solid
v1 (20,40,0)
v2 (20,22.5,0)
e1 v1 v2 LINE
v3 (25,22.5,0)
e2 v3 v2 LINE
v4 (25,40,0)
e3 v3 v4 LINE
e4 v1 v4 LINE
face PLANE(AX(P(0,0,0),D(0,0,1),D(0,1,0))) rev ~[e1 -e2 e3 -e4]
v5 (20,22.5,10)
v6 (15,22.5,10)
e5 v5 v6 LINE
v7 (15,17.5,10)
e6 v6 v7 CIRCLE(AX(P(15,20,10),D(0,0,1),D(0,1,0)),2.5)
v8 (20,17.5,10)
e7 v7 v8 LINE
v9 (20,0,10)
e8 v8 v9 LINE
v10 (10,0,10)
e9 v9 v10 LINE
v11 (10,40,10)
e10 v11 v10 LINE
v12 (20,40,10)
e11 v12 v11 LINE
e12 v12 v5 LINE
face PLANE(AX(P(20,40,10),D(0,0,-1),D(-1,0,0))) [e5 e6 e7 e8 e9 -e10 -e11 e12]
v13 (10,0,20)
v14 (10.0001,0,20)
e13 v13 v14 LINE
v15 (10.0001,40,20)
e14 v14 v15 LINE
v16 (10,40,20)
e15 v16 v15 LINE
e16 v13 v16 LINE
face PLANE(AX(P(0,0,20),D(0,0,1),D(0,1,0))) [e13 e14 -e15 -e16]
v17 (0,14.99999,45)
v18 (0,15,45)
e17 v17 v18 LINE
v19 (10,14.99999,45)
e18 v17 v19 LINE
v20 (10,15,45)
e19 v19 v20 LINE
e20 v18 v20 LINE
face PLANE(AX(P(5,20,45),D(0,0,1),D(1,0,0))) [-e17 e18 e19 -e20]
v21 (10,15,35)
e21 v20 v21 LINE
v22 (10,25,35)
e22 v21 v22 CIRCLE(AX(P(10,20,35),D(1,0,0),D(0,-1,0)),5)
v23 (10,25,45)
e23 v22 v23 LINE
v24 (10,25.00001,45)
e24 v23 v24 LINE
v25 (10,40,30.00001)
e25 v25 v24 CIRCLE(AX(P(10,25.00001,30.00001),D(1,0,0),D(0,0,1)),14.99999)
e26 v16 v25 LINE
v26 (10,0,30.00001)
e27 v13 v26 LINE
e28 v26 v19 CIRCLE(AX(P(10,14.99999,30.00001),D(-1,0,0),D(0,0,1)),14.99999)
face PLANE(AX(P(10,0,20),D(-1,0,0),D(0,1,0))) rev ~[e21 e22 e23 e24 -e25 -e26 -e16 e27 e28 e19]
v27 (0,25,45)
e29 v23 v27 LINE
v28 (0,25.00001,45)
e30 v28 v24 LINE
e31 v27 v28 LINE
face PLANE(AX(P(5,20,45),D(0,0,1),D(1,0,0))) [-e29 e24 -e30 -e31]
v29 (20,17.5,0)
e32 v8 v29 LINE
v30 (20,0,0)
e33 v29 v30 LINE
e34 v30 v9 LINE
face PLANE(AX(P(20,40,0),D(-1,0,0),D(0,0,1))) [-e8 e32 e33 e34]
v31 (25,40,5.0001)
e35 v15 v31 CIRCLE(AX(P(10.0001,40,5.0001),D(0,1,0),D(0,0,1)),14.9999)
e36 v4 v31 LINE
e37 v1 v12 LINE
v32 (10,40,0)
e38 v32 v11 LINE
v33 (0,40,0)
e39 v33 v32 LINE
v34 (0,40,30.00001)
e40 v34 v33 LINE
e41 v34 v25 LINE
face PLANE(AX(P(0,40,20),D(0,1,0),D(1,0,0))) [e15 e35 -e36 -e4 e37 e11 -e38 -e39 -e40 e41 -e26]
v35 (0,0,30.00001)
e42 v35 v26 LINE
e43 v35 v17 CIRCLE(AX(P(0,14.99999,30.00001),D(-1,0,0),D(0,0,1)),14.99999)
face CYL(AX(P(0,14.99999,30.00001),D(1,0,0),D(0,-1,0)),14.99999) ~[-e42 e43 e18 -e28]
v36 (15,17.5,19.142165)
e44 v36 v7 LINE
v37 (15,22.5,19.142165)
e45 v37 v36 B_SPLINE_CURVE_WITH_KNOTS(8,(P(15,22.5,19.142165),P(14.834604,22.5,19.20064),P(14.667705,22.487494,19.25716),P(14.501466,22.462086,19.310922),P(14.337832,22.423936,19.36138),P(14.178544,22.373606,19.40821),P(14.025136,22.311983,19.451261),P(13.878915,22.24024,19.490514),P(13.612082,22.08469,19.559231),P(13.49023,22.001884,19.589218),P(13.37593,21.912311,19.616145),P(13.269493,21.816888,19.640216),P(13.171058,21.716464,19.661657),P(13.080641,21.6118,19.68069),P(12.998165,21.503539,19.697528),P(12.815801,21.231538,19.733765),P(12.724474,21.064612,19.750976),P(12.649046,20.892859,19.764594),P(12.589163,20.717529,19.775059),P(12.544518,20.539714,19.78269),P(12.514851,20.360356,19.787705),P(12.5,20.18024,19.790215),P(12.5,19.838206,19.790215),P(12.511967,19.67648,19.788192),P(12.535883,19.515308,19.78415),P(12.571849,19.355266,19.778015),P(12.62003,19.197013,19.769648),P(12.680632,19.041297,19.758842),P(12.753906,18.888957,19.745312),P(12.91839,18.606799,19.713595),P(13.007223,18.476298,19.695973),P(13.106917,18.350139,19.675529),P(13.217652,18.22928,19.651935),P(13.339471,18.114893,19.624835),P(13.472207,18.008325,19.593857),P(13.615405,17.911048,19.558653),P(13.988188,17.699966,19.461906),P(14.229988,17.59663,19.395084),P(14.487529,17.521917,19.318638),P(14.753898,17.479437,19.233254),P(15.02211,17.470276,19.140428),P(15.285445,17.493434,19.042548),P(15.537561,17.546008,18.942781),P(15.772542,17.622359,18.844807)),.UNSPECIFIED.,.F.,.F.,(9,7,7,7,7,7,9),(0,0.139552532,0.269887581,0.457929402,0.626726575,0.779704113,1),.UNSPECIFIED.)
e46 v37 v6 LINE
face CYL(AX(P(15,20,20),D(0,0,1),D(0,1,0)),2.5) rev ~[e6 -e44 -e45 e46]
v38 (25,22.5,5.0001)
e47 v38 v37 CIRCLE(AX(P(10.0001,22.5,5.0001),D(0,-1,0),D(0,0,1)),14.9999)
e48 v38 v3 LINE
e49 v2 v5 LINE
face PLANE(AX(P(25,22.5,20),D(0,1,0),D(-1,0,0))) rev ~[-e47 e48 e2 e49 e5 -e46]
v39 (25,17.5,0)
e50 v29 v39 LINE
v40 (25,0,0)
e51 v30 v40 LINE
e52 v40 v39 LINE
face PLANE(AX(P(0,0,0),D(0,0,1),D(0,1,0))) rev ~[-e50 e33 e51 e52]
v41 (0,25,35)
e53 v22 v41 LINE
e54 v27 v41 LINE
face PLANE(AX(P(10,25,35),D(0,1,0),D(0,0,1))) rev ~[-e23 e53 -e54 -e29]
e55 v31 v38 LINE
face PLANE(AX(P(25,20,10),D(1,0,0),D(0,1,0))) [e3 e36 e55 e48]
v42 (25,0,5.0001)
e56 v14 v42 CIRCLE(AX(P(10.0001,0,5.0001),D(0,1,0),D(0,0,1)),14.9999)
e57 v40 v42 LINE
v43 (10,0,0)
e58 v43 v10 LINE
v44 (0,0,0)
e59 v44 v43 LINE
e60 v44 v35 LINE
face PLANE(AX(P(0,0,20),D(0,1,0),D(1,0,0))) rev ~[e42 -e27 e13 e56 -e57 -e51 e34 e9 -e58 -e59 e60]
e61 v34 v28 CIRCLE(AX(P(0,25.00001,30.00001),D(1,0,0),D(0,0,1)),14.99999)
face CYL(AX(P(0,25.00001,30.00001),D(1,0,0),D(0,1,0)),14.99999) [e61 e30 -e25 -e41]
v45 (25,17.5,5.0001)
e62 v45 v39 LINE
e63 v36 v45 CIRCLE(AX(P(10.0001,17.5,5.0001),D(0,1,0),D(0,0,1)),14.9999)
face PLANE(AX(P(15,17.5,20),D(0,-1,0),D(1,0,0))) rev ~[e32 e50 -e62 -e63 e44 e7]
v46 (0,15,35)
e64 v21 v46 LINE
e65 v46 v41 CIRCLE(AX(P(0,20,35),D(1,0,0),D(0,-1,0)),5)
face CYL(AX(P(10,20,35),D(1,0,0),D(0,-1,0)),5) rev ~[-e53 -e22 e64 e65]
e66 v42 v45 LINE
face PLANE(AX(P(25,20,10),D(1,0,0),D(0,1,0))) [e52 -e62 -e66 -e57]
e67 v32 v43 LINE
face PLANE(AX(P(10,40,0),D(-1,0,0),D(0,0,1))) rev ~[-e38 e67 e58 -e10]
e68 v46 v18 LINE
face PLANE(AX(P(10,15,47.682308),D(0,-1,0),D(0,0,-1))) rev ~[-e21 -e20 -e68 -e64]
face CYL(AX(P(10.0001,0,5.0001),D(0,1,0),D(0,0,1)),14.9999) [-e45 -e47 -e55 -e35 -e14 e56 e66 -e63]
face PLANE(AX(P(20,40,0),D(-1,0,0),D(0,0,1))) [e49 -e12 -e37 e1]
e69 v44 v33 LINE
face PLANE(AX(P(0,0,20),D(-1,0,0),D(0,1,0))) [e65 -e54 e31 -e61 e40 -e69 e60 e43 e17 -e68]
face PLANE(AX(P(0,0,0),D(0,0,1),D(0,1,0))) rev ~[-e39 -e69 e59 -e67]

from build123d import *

# Parameters (mm, degrees)
F0_W      = 40
F0_H      = 20
F1_DEPTH  = 25
F2_W      = 10
F2_H      = 40
F3_DEPTH  = 25
F4_W      = 10
F4_H      = 2.6823076606
F5_DEPTH  = 50
F7_DEPTH  = 50
F8_R      = 14.99999
F9_F1_R   = 14.9999
F10_W     = 10
F10_H     = 10
F11_DEPTH = 100


# Not quite as in the source:
# - a fillet or chamfer is up to 0.001 mm smaller than in the source, because OpenCascade refuses the exact size


with BuildPart() as f1:
    # F0 (on Right) → F1 (new body)
    with BuildSketch(Plane.YZ):
        with Locations((20, 10)):
            Rectangle(F0_W, F0_H)
    extrude(amount=F1_DEPTH)

    # F2 (on face) → F3 (join)
    with BuildSketch(Plane.XY.offset(20)):
        with Locations((5, 20)):
            Rectangle(F2_W, F2_H)
    extrude(amount=F3_DEPTH)

    # F4 (on face) → F5 (cut)
    with BuildSketch(Plane.YZ.offset(10)):
        with BuildLine():
            Line((15, 45), (15, 35))
            ThreePointArc((15, 35), (20, 30), (25, 35))
            Line((25, 35), (25, 45))
            Line((25, 45), (15, 45))
        make_face()
        with Locations((20, 46.3411538303)):
            Rectangle(F4_W, F4_H)
    extrude(amount=-F5_DEPTH, mode=Mode.SUBTRACT)

    # F6 (on face) → F7 (cut)
    with BuildSketch(Plane.XY.offset(20)):
        with BuildLine():
            Line((25, 22.5), (15, 22.5))
            ThreePointArc((15, 22.5), (12.5, 20), (15, 17.5))
            Line((15, 17.5), (25, 17.5))
            Line((25, 17.5), (25, 22.5))
        make_face()
    extrude(amount=-F7_DEPTH, mode=Mode.SUBTRACT)

    # F8 (radius 15 in the source; OpenCascade refuses exactly that, so slightly less here)
    f8_edges = [f1.edges().sort_by_distance(p)[0] for p in [
        (5, 40, 45),
        (5, 0, 45),
    ]]
    fillet(f8_edges, radius=F8_R)

    # F9: fillet of radius 15 on 2 edges, made by hand

    # F9_f1 (radius 15 in the source; OpenCascade refuses exactly that, so slightly less here)
    f9_f1_edges = [f1.edges().sort_by_distance(p)[0] for p in [
        (25, 8.75, 20),
    ]]
    fillet(f9_f1_edges, radius=F9_F1_R)

    # F10 (on face) → F11 (cut)
    with BuildSketch(Plane(origin=(0, 40, 0), x_dir=(-1, 0, 0), z_dir=(0, 1, 0))):
        with Locations((-15, 5)):
            Rectangle(F10_W, F10_H)
    extrude(amount=-F11_DEPTH, mode=Mode.SUBTRACT)


solid = f1.part
